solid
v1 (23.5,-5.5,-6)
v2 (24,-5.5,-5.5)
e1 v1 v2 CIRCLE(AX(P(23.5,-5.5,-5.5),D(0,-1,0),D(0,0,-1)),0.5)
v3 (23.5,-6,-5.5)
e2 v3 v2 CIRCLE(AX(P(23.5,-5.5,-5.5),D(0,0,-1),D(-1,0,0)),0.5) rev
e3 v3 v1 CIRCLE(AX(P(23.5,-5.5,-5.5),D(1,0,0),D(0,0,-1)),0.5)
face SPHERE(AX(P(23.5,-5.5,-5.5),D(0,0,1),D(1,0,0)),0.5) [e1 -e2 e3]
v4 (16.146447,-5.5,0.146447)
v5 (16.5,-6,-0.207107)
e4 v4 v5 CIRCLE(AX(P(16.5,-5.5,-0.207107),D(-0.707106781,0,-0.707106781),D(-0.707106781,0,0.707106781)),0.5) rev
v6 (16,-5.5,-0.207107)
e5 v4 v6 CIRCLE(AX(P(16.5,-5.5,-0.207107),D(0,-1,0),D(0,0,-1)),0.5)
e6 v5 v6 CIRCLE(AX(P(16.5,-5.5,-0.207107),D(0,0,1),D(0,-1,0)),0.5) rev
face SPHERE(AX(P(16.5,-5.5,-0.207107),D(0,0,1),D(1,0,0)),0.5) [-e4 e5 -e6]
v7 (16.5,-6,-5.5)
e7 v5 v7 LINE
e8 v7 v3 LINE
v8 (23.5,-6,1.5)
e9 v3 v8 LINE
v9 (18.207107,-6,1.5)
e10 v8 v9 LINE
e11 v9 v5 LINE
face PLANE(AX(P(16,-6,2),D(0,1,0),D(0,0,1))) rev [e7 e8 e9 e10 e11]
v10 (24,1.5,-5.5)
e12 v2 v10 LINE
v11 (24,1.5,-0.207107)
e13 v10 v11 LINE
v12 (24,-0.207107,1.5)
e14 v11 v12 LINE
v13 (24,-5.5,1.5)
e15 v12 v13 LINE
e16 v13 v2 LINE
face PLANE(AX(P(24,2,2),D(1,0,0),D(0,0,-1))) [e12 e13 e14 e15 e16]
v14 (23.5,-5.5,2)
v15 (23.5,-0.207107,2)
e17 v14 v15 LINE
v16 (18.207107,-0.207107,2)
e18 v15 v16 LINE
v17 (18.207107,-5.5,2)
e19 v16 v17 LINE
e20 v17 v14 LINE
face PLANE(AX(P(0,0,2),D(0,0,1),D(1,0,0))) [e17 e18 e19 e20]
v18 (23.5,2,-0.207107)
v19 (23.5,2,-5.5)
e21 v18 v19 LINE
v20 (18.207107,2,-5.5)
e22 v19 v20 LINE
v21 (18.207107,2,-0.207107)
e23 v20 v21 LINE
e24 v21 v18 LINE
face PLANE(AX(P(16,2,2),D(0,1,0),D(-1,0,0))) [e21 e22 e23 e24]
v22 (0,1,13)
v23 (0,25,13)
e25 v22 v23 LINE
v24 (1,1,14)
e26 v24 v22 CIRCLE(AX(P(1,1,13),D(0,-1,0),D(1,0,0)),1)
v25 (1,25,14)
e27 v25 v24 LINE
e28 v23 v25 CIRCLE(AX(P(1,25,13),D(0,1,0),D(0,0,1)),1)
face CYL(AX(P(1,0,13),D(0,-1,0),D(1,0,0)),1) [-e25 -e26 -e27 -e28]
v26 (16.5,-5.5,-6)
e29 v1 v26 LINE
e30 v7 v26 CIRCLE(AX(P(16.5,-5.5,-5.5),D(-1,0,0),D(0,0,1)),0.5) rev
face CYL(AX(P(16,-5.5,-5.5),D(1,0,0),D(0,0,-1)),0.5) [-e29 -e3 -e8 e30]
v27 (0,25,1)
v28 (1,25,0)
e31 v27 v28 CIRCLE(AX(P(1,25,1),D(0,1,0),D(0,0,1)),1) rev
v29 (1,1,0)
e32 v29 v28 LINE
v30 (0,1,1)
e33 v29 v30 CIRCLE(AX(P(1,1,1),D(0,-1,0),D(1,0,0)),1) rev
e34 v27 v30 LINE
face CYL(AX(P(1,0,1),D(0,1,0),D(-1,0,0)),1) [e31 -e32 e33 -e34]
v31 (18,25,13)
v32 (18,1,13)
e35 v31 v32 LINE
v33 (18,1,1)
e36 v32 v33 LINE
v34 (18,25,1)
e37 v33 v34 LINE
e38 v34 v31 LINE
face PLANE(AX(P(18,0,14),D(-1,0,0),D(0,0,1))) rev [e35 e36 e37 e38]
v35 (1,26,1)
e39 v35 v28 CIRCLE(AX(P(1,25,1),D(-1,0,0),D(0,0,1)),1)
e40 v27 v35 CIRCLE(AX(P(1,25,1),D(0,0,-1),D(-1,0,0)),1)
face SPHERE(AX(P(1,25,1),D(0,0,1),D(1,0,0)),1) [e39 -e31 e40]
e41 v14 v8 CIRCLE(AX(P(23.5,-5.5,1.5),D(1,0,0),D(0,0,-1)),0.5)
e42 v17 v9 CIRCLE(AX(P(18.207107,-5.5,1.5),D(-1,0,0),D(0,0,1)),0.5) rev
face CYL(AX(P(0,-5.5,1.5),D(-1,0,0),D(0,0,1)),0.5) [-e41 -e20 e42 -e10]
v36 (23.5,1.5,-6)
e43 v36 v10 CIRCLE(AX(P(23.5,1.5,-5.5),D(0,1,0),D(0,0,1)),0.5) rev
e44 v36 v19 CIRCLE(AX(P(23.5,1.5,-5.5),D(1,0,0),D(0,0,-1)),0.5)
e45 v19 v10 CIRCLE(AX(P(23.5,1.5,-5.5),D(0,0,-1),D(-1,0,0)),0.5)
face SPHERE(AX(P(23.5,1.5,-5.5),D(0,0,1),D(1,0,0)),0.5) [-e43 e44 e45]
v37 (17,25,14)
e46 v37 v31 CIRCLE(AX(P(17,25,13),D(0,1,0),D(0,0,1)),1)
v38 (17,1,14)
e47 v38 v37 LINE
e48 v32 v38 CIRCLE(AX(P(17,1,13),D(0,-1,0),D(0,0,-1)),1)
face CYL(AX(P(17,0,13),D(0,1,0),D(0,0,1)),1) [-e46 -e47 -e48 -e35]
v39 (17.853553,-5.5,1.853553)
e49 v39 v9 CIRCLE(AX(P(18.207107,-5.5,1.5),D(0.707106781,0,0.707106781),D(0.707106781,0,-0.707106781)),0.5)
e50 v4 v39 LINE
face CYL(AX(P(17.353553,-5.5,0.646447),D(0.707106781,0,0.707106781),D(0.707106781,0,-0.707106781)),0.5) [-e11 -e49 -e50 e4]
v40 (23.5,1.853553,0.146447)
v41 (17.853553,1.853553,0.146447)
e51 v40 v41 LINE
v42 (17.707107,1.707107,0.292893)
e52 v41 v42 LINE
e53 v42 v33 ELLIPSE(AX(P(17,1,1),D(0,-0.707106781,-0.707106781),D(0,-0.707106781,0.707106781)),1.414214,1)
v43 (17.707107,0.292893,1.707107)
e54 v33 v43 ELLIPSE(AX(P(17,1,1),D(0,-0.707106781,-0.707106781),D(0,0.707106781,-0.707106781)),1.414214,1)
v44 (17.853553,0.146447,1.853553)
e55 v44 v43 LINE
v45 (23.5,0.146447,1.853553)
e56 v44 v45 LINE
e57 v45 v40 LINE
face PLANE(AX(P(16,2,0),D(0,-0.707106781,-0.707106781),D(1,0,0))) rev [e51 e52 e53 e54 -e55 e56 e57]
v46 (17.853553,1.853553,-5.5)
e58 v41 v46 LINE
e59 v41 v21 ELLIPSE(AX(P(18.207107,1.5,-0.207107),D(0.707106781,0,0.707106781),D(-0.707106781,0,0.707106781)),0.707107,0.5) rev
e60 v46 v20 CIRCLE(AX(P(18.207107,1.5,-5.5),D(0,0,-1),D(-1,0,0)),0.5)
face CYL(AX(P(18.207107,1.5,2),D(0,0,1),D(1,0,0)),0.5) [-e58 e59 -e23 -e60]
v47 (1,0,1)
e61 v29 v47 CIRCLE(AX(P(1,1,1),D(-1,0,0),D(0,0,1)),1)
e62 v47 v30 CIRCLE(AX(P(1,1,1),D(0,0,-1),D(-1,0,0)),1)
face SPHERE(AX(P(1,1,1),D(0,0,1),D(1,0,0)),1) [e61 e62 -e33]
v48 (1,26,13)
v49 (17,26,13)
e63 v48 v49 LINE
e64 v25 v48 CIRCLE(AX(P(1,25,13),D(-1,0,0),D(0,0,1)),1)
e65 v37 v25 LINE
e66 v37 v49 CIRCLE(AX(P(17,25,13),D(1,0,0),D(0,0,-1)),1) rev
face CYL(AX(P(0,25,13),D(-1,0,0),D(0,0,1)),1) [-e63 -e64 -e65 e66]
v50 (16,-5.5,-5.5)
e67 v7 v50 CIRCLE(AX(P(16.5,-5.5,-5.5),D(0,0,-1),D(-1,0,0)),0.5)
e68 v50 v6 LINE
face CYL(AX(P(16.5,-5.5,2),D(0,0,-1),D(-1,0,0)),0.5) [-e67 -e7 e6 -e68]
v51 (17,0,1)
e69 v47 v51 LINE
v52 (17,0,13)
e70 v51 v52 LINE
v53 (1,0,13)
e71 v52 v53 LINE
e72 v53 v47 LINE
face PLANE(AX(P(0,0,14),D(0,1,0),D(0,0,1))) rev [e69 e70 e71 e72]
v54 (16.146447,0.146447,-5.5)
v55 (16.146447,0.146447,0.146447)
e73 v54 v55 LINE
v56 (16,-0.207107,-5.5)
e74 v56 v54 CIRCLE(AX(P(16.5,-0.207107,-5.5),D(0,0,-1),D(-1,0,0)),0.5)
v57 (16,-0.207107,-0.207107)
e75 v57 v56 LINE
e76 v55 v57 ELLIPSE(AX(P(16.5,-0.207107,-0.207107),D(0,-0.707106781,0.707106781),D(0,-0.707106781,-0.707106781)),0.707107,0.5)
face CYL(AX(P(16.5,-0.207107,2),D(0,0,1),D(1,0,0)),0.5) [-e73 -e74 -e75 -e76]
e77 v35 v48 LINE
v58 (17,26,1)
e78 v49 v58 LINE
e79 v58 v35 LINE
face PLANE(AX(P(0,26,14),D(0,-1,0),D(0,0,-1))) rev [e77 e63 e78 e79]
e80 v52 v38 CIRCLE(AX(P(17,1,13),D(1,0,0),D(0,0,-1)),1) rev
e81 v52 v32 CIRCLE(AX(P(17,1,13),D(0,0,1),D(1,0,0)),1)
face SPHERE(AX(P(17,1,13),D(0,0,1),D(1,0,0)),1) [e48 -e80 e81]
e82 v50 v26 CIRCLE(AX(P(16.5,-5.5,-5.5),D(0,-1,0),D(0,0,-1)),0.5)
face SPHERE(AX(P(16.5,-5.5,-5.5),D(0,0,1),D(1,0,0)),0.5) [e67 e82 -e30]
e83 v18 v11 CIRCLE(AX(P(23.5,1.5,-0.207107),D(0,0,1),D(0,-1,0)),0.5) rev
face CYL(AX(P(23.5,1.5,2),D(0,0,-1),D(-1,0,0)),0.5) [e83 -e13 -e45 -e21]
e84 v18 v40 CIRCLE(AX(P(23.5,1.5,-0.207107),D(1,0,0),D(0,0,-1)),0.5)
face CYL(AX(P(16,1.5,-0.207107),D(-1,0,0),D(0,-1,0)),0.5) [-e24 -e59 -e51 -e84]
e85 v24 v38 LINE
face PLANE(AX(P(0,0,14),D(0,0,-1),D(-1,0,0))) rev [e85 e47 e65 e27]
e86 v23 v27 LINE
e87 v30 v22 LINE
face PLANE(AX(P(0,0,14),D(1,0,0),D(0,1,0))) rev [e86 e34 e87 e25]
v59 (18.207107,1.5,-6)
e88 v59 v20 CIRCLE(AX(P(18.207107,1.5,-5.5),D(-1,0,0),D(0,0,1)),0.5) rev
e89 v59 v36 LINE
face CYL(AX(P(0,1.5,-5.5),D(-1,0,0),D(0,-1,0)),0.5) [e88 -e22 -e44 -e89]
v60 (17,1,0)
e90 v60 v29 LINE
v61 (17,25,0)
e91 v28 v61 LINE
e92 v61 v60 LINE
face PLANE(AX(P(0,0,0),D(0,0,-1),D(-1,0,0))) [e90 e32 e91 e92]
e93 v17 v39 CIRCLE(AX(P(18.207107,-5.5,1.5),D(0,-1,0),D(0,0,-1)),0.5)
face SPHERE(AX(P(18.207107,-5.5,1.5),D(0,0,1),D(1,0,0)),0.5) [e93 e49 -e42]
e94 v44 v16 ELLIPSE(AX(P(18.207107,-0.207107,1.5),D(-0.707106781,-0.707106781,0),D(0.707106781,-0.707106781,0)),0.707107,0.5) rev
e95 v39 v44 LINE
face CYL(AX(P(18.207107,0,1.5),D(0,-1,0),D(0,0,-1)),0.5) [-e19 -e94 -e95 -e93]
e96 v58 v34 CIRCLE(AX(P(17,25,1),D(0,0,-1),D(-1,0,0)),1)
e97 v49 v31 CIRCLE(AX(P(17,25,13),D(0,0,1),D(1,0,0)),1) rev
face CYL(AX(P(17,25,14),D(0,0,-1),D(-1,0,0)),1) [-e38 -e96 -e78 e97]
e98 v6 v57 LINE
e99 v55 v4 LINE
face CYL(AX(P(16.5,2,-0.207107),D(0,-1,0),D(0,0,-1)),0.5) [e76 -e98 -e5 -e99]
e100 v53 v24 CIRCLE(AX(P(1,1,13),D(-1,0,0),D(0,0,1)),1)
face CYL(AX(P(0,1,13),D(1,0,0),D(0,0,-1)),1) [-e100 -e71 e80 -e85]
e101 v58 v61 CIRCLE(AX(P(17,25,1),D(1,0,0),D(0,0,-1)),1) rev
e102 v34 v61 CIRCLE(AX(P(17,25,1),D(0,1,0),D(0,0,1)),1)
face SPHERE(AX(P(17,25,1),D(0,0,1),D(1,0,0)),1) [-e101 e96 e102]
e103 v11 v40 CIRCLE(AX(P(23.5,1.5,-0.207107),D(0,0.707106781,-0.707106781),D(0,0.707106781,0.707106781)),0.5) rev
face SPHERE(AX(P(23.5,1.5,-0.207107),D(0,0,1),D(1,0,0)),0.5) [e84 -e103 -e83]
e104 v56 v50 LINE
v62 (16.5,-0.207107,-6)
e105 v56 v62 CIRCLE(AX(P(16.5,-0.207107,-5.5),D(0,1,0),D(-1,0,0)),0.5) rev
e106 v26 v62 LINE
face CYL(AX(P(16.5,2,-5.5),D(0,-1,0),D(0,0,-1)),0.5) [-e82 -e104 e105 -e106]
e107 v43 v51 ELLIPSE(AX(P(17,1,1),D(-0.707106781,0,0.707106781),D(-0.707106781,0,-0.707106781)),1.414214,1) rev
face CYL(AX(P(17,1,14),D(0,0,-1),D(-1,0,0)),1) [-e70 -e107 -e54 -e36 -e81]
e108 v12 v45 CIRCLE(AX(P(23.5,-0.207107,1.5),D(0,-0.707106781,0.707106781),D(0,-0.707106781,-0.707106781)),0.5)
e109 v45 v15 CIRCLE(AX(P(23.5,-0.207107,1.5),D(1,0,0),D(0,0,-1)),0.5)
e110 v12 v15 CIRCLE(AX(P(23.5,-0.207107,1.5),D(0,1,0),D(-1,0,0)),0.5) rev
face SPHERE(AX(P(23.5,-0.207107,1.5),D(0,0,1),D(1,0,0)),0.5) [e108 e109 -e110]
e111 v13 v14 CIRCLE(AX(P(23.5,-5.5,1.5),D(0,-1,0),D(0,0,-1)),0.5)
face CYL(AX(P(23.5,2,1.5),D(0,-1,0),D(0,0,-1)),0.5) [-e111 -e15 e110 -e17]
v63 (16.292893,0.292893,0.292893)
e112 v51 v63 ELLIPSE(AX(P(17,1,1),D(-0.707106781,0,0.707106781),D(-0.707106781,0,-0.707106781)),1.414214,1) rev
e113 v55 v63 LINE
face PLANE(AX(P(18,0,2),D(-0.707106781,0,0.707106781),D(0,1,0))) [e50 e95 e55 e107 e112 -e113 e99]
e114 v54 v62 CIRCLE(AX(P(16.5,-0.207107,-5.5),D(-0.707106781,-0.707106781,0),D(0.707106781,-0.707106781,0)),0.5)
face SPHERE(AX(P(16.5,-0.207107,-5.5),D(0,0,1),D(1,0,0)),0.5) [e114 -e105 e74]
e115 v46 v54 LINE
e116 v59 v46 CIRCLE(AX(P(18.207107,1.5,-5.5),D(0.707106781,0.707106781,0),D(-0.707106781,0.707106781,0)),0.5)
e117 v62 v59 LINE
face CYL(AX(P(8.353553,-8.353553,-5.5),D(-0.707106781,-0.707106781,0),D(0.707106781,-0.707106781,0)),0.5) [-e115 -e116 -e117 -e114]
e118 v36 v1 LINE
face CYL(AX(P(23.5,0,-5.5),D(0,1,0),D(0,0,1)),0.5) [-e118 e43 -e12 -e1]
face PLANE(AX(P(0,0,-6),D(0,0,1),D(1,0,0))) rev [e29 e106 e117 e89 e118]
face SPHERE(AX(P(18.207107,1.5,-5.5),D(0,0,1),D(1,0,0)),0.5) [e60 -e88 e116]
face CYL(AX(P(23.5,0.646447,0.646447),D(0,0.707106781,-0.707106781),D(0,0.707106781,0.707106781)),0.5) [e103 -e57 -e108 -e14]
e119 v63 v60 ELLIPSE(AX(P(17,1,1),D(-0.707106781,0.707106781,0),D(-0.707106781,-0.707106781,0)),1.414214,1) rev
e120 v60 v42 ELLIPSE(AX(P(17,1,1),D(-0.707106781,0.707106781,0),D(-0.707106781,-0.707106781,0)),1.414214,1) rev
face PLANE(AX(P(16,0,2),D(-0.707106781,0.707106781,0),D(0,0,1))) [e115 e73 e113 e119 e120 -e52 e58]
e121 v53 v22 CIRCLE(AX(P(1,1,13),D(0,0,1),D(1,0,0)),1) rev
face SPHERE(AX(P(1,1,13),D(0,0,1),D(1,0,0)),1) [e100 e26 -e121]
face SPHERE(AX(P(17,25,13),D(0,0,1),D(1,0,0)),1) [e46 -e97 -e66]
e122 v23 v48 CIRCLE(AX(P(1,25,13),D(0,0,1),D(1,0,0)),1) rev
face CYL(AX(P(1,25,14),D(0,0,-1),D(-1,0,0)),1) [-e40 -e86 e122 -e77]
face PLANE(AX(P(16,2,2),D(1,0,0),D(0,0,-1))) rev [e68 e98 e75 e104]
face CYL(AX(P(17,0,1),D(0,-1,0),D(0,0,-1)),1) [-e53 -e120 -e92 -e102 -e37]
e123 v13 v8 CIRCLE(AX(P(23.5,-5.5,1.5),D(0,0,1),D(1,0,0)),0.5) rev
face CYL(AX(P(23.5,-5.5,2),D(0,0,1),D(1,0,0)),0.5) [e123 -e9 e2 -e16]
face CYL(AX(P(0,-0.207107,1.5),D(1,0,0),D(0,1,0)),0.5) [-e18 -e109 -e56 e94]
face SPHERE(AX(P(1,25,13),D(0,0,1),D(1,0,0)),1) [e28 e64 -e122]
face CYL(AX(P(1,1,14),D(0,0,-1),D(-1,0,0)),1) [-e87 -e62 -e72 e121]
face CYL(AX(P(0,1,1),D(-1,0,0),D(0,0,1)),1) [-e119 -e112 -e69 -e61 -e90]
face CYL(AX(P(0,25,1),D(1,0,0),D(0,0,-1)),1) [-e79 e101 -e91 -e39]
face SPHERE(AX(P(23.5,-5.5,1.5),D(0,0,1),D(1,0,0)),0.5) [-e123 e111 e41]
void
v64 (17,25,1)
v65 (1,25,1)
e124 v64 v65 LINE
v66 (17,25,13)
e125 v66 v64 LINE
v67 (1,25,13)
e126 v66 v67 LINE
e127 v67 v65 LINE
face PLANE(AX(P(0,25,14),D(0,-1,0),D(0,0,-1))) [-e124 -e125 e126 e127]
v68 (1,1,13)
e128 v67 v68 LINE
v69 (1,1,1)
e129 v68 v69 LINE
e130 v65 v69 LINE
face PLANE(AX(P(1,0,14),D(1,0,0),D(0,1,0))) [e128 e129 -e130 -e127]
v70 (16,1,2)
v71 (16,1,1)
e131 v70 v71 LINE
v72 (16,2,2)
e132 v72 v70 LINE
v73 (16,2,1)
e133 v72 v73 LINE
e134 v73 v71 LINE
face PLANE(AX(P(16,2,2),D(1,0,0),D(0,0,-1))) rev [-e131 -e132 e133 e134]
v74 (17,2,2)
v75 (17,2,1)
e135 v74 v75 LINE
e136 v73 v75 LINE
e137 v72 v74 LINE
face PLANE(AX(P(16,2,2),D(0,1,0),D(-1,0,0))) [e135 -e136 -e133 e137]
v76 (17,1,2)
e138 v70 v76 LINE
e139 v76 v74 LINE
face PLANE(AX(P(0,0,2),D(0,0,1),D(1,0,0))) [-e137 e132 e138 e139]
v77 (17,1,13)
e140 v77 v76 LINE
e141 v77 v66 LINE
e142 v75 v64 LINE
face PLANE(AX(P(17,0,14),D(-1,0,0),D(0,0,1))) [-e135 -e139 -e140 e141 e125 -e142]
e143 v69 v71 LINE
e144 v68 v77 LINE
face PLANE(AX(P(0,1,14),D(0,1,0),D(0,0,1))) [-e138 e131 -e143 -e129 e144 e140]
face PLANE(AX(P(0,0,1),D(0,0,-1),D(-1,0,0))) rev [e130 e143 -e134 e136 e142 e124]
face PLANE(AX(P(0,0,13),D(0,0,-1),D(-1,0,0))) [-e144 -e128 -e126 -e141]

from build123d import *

# Parameters (mm, degrees)
SKETCH1_W                = 18
SKETCH1_H                = 26
BOSS_EXTRUDE1_DEPTH      = 14
SHELL1_T                 = 1
BOSS_EXTRUDE3_DEPTH      = 6
BOSS_EXTRUDE3_DEPTH_BACK = 2
SKETCH2_W                = 8
SKETCH2_H                = 8
CHAMFER2_SIZE            = 2
FILLET1_R                = 1
FILLET2_R                = 0.5


with BuildPart() as part:
    # Sketch1 → Boss-Extrude1 (new body)
    with BuildSketch(Plane.XY):
        with Locations((9, 13)):
            Rectangle(SKETCH1_W, SKETCH1_H)
    extrude(amount=BOSS_EXTRUDE1_DEPTH)

    # Shell1 (no face opened: a closed hollow body)
    add(offset(amount=-SHELL1_T, mode=Mode.PRIVATE), mode=Mode.SUBTRACT)

    # Sketch2 → Boss-Extrude3 (add, two sides: drawn at the far end of the back side and taken through both)
    with BuildSketch(Plane(origin=(0, 0, 0), x_dir=(-1, 0, 0), z_dir=(0, 0, -1)).offset(-BOSS_EXTRUDE3_DEPTH_BACK)):
        with Locations((-20, -2)):
            Rectangle(SKETCH2_W, SKETCH2_H)
    extrude(amount=BOSS_EXTRUDE3_DEPTH + BOSS_EXTRUDE3_DEPTH_BACK)

    # Chamfer2
    chamfer2_edges = [part.edges().sort_by_distance(p)[0] for p in [
        (16, -3, 2),
        (16, 2, -3),
        (21, 2, 2),
    ]]
    chamfer(chamfer2_edges, length=CHAMFER2_SIZE)

    # Fillet1
    # the kernel refuses this fillet: 1 mm, written as the material it takes off along each edge
    with BuildSketch(Plane(origin=(1, 25, 1), x_dir=(0, 1, 0), z_dir=(0, 0, -1))) as fillet1_piece_1_section:
        Polygon((0, 0), (FILLET1_R, 0), (FILLET1_R, -FILLET1_R), (0, -FILLET1_R), align=None)
    fillet1_piece_1 = extrude(amount=FILLET1_R, mode=Mode.PRIVATE)
    fillet1_piece_1 = fillet1_piece_1 - Plane(origin=(1, 25, 1), x_dir=(0.7071067811865475, -0.7071067811865477, 0), z_dir=(0, 0, -1)) * Sphere(FILLET1_R, mode=Mode.PRIVATE)
    add(fillet1_piece_1, mode=Mode.SUBTRACT)
    with BuildSketch(Plane(origin=(1, 1, 1), x_dir=(0, 0, -1), z_dir=(0, -1, 0))) as fillet1_piece_2_section:
        Polygon((0, 0), (FILLET1_R, 0), (FILLET1_R, -FILLET1_R), (0, -FILLET1_R), align=None)
    fillet1_piece_2 = extrude(amount=FILLET1_R, mode=Mode.PRIVATE)
    fillet1_piece_2 = fillet1_piece_2 - Plane(origin=(1, 1, 1), x_dir=(0.7071067811865475, 0, 0.7071067811865475), z_dir=(0, -1, 0)) * Sphere(FILLET1_R, mode=Mode.PRIVATE)
    add(fillet1_piece_2, mode=Mode.SUBTRACT)
    with BuildSketch(Plane(origin=(17, 25, 1), x_dir=(0, 0, -1), z_dir=(0, 1, 0))) as fillet1_piece_3_section:
        Polygon((0, 0), (FILLET1_R, 0), (FILLET1_R, -FILLET1_R), (0, -FILLET1_R), align=None)
    fillet1_piece_3 = extrude(amount=FILLET1_R, mode=Mode.PRIVATE)
    fillet1_piece_3 = fillet1_piece_3 - Plane(origin=(17, 25, 1), x_dir=(-0.7071067811865475, 0, 0.7071067811865475), z_dir=(0, 1, 0)) * Sphere(FILLET1_R, mode=Mode.PRIVATE)
    add(fillet1_piece_3, mode=Mode.SUBTRACT)
    with BuildSketch(Plane(origin=(1, 1, 13), x_dir=(-1, 0, 0), z_dir=(0, -1, 0))) as fillet1_piece_4_section:
        Polygon((0, 0), (FILLET1_R, 0), (FILLET1_R, -FILLET1_R), (0, -FILLET1_R), align=None)
    fillet1_piece_4 = extrude(amount=FILLET1_R, mode=Mode.PRIVATE)
    fillet1_piece_4 = fillet1_piece_4 - Plane(origin=(1, 1, 13), x_dir=(0.7071067811865475, 0, -0.7071067811865475), z_dir=(0, -1, 0)) * Sphere(FILLET1_R, mode=Mode.PRIVATE)
    add(fillet1_piece_4, mode=Mode.SUBTRACT)
    with BuildSketch(Plane(origin=(17, 1, 13), x_dir=(1, 0, 0), z_dir=(0, -1, 0))) as fillet1_piece_5_section:
        Polygon((0, 0), (FILLET1_R, 0), (FILLET1_R, FILLET1_R), (0, FILLET1_R), align=None)
    fillet1_piece_5 = extrude(amount=FILLET1_R, mode=Mode.PRIVATE)
    fillet1_piece_5 = fillet1_piece_5 - Plane(origin=(17, 1, 13), x_dir=(-0.7071067811865475, 0, -0.7071067811865475), z_dir=(0, -1, 0)) * Sphere(FILLET1_R, mode=Mode.PRIVATE)
    add(fillet1_piece_5, mode=Mode.SUBTRACT)
    with BuildSketch(Plane(origin=(17, 25, 13), x_dir=(1, 0, 0), z_dir=(0, 1, 0))) as fillet1_piece_6_section:
        Polygon((0, 0), (FILLET1_R, 0), (FILLET1_R, -FILLET1_R), (0, -FILLET1_R), align=None)
    fillet1_piece_6 = extrude(amount=FILLET1_R, mode=Mode.PRIVATE)
    fillet1_piece_6 = fillet1_piece_6 - Plane(origin=(17, 25, 13), x_dir=(-0.7071067811865475, 0, -0.7071067811865475), z_dir=(0, 1, 0)) * Sphere(FILLET1_R, mode=Mode.PRIVATE)
    add(fillet1_piece_6, mode=Mode.SUBTRACT)
    with BuildSketch(Plane(origin=(1, 25, 13), x_dir=(-1, 0, 0), z_dir=(0, 1, 0))) as fillet1_piece_7_section:
        Polygon((0, 0), (FILLET1_R, 0), (FILLET1_R, FILLET1_R), (0, FILLET1_R), align=None)
    fillet1_piece_7 = extrude(amount=FILLET1_R, mode=Mode.PRIVATE)
    fillet1_piece_7 = fillet1_piece_7 - Plane(origin=(1, 25, 13), x_dir=(0.7071067811865475, 0, -0.7071067811865475), z_dir=(0, 1, 0)) * Sphere(FILLET1_R, mode=Mode.PRIVATE)
    add(fillet1_piece_7, mode=Mode.SUBTRACT)
    with BuildSketch(Plane(origin=(0, 25, 0), x_dir=(1, 0, 0), z_dir=(0, -1, 0)), Plane(origin=(18, 1, 14), x_dir=(0, 0, -1), z_dir=(0, 1, 0)), Plane(origin=(0, 25, 14), x_dir=(0, 0, -1), z_dir=(0, -1, 0))) as fillet1_piece_8:
        with BuildLine():
            CenterArc((FILLET1_R, FILLET1_R), FILLET1_R, 180, 90)
            Line((0, FILLET1_R), (0, 0))
            Line((0, 0), (FILLET1_R, 0))
        make_face()
    extrude(amount=24, mode=Mode.SUBTRACT)
    with BuildSketch(Plane(origin=(1, 0, 0), x_dir=(0, 0, 1), z_dir=(1, 0, 0))) as fillet1_piece_9_section:
        with BuildLine():
            CenterArc((FILLET1_R, -FILLET1_R), FILLET1_R, 90, 90)
            Line((0, -FILLET1_R), (0, 0))
            Line((0, 0), (FILLET1_R, 0))
        make_face()
    fillet1_piece_9 = extrude(amount=17.5, mode=Mode.PRIVATE)
    fillet1_piece_9 = split(fillet1_piece_9, bisect_by=Plane(origin=(12.381861728, 0.226424858, -3.618138272), z_dir=(-0.7071067811865476, 0, 0.7071067811865476)), keep=Keep.TOP, mode=Mode.PRIVATE)
    fillet1_piece_9 = split(fillet1_piece_9, bisect_by=Plane(origin=(12.381861728, -3.618138272, 0.226424858), z_dir=(-0.7071067811865476, 0.7071067811865476, 0)), keep=Keep.TOP, mode=Mode.PRIVATE)
    add(fillet1_piece_9, mode=Mode.SUBTRACT)
    with BuildSketch(Plane(origin=(1, 0, 0), x_dir=(0, 0, 1), z_dir=(1, 0, 0))) as fillet1_piece_10_section:
        with BuildLine():
            CenterArc((FILLET1_R, -FILLET1_R), FILLET1_R, 90, 90)
            Line((0, -FILLET1_R), (0, 0))
            Line((0, 0), (FILLET1_R, 0))
        make_face()
    fillet1_piece_10 = extrude(amount=17.5, mode=Mode.PRIVATE)
    fillet1_piece_10 = split(fillet1_piece_10, bisect_by=Plane(origin=(16.16446835, 0.528927527, 0.16446835), z_dir=(0.7071067811865476, 0, -0.7071067811865476)), keep=Keep.TOP, mode=Mode.PRIVATE)
    fillet1_piece_10 = split(fillet1_piece_10, bisect_by=Plane(origin=(16.407441135, 0.407441135, 0.042981958), z_dir=(-0.7071067811865476, 0.7071067811865476, 0)), keep=Keep.TOP, mode=Mode.PRIVATE)
    add(fillet1_piece_10, mode=Mode.SUBTRACT)
    with BuildSketch(Plane(origin=(1, 0, 0), x_dir=(0, 0, 1), z_dir=(1, 0, 0))) as fillet1_piece_11_section:
        with BuildLine():
            CenterArc((FILLET1_R, -FILLET1_R), FILLET1_R, 90, 90)
            Line((0, -FILLET1_R), (0, 0))
            Line((0, 0), (FILLET1_R, 0))
        make_face()
    fillet1_piece_11 = extrude(amount=17.5, mode=Mode.PRIVATE)
    fillet1_piece_11 = split(fillet1_piece_11, bisect_by=Plane(origin=(16.407441135, 0.042981958, 0.407441135), z_dir=(-0.7071067811865476, 0, 0.7071067811865476)), keep=Keep.TOP, mode=Mode.PRIVATE)
    fillet1_piece_11 = split(fillet1_piece_11, bisect_by=Plane(origin=(16.16446835, 0.16446835, 0.528927527), z_dir=(0.7071067811865476, -0.7071067811865476, 0)), keep=Keep.TOP, mode=Mode.PRIVATE)
    add(fillet1_piece_11, mode=Mode.SUBTRACT)
    with BuildSketch(Plane(origin=(18, -0.5, 0), x_dir=(-1, 0, 0), z_dir=(0, 1, 0))) as fillet1_piece_12_section:
        with BuildLine():
            CenterArc((FILLET1_R, FILLET1_R), FILLET1_R, 180, 90)
            Line((0, FILLET1_R), (0, 0))
            Line((0, 0), (FILLET1_R, 0))
        make_face()
    fillet1_piece_12 = extrude(amount=25.5, mode=Mode.PRIVATE)
    fillet1_piece_12 = split(fillet1_piece_12, bisect_by=Plane(origin=(17.83553165, 1.83553165, 0.528927527), z_dir=(0.7071067811865476, -0.7071067811865476, 0)), keep=Keep.TOP, mode=Mode.PRIVATE)
    fillet1_piece_12 = split(fillet1_piece_12, bisect_by=Plane(origin=(17.957018042, 1.592558865, 0.407441135), z_dir=(0, 0.7071067811865476, 0.7071067811865476)), keep=Keep.TOP, mode=Mode.PRIVATE)
    add(fillet1_piece_12, mode=Mode.SUBTRACT)
    with BuildSketch(Plane(origin=(18, -0.5, 0), x_dir=(-1, 0, 0), z_dir=(0, 1, 0))) as fillet1_piece_13_section:
        with BuildLine():
            CenterArc((FILLET1_R, FILLET1_R), FILLET1_R, 180, 90)
            Line((0, FILLET1_R), (0, 0))
            Line((0, 0), (FILLET1_R, 0))
        make_face()
    fillet1_piece_13 = extrude(amount=25.5, mode=Mode.PRIVATE)
    fillet1_piece_13 = split(fillet1_piece_13, bisect_by=Plane(origin=(17.592558865, 1.592558865, 0.042981958), z_dir=(-0.7071067811865476, 0.7071067811865476, 0)), keep=Keep.TOP, mode=Mode.PRIVATE)
    fillet1_piece_13 = split(fillet1_piece_13, bisect_by=Plane(origin=(17.471072473, 1.83553165, 0.16446835), z_dir=(0, -0.7071067811865476, -0.7071067811865476)), keep=Keep.TOP, mode=Mode.PRIVATE)
    add(fillet1_piece_13, mode=Mode.SUBTRACT)
    with BuildSketch(Plane(origin=(18, -0.5, 0), x_dir=(-1, 0, 0), z_dir=(0, 1, 0))) as fillet1_piece_14_section:
        with BuildLine():
            CenterArc((FILLET1_R, FILLET1_R), FILLET1_R, 180, 90)
            Line((0, FILLET1_R), (0, 0))
            Line((0, 0), (FILLET1_R, 0))
        make_face()
    fillet1_piece_14 = extrude(amount=25.5, mode=Mode.PRIVATE)
    fillet1_piece_14 = split(fillet1_piece_14, bisect_by=Plane(origin=(23.618173362, 7.618173362, 0.226414546), z_dir=(-0.7071067811865476, 0.7071067811865476, 0)), keep=Keep.TOP, mode=Mode.PRIVATE)
    fillet1_piece_14 = split(fillet1_piece_14, bisect_by=Plane(origin=(17.773585454, 7.618173362, -5.618173362), z_dir=(0, 0.7071067811865476, 0.7071067811865476)), keep=Keep.TOP, mode=Mode.PRIVATE)
    add(fillet1_piece_14, mode=Mode.SUBTRACT)
    with BuildSketch(Plane(origin=(17, 26, 0), x_dir=(0, -1, 0), z_dir=(-1, 0, 0)), Plane(origin=(1, 0, 14), x_dir=(0, 0, -1), z_dir=(1, 0, 0))) as fillet1_piece_15:
        with BuildLine():
            CenterArc((FILLET1_R, FILLET1_R), FILLET1_R, 180, 90)
            Line((0, FILLET1_R), (0, 0))
            Line((0, 0), (FILLET1_R, 0))
        make_face()
    extrude(amount=16, mode=Mode.SUBTRACT)
    with BuildSketch(Plane(origin=(17, 26, 14), x_dir=(0, -1, 0), z_dir=(-1, 0, 0))) as fillet1_piece_16:
        with BuildLine():
            CenterArc((FILLET1_R, -FILLET1_R), FILLET1_R, 90, 90)
            Line((0, -FILLET1_R), (0, 0))
            Line((0, 0), (FILLET1_R, 0))
        make_face()
    extrude(amount=16, mode=Mode.SUBTRACT)
    with BuildSketch(Plane(origin=(0, 26, 1), x_dir=(0, -1, 0), z_dir=(0, 0, 1)), Plane(origin=(0, 0, 1), x_dir=(1, 0, 0), z_dir=(0, 0, 1))) as fillet1_piece_17:
        with BuildLine():
            CenterArc((FILLET1_R, FILLET1_R), FILLET1_R, 180, 90)
            Line((0, FILLET1_R), (0, 0))
            Line((0, 0), (FILLET1_R, 0))
        make_face()
    extrude(amount=12, mode=Mode.SUBTRACT)
    with BuildSketch(Plane(origin=(18, 26, 1), x_dir=(0, -1, 0), z_dir=(0, 0, 1))) as fillet1_piece_18:
        with BuildLine():
            CenterArc((FILLET1_R, -FILLET1_R), FILLET1_R, 90, 90)
            Line((0, -FILLET1_R), (0, 0))
            Line((0, 0), (FILLET1_R, 0))
        make_face()
    extrude(amount=12, mode=Mode.SUBTRACT)
    with BuildSketch(Plane(origin=(18, 0, -0.5), x_dir=(-1, 0, 0), z_dir=(0, 0, 1))) as fillet1_piece_19_section:
        with BuildLine():
            CenterArc((FILLET1_R, -FILLET1_R), FILLET1_R, 90, 90)
            Line((0, -FILLET1_R), (0, 0))
            Line((0, 0), (FILLET1_R, 0))
        make_face()
    fillet1_piece_19 = extrude(amount=13.5, mode=Mode.PRIVATE)
    fillet1_piece_19 = split(fillet1_piece_19, bisect_by=Plane(origin=(17.83553165, 0.528927527, 1.83553165), z_dir=(0.7071067811865476, 0, -0.7071067811865476)), keep=Keep.TOP, mode=Mode.PRIVATE)
    fillet1_piece_19 = split(fillet1_piece_19, bisect_by=Plane(origin=(17.957018042, 0.407441135, 1.592558865), z_dir=(0, 0.7071067811865476, 0.7071067811865476)), keep=Keep.TOP, mode=Mode.PRIVATE)
    add(fillet1_piece_19, mode=Mode.SUBTRACT)
    with BuildSketch(Plane(origin=(18, 0, -0.5), x_dir=(-1, 0, 0), z_dir=(0, 0, 1))) as fillet1_piece_20_section:
        with BuildLine():
            CenterArc((FILLET1_R, -FILLET1_R), FILLET1_R, 90, 90)
            Line((0, -FILLET1_R), (0, 0))
            Line((0, 0), (FILLET1_R, 0))
        make_face()
    fillet1_piece_20 = extrude(amount=13.5, mode=Mode.PRIVATE)
    fillet1_piece_20 = split(fillet1_piece_20, bisect_by=Plane(origin=(17.592558865, 0.042981958, 1.592558865), z_dir=(-0.7071067811865476, 0, 0.7071067811865476)), keep=Keep.TOP, mode=Mode.PRIVATE)
    fillet1_piece_20 = split(fillet1_piece_20, bisect_by=Plane(origin=(17.471072473, 0.16446835, 1.83553165), z_dir=(0, -0.7071067811865476, -0.7071067811865476)), keep=Keep.TOP, mode=Mode.PRIVATE)
    add(fillet1_piece_20, mode=Mode.SUBTRACT)
    with BuildSketch(Plane(origin=(18, 0, -0.5), x_dir=(-1, 0, 0), z_dir=(0, 0, 1))) as fillet1_piece_21_section:
        with BuildLine():
            CenterArc((FILLET1_R, -FILLET1_R), FILLET1_R, 90, 90)
            Line((0, -FILLET1_R), (0, 0))
            Line((0, 0), (FILLET1_R, 0))
        make_face()
    fillet1_piece_21 = extrude(amount=13.5, mode=Mode.PRIVATE)
    fillet1_piece_21 = split(fillet1_piece_21, bisect_by=Plane(origin=(20.618101716, 0.226435602, 4.618101716), z_dir=(-0.7071067811865476, 0, 0.7071067811865476)), keep=Keep.TOP, mode=Mode.PRIVATE)
    fillet1_piece_21 = split(fillet1_piece_21, bisect_by=Plane(origin=(17.773564398, -2.618101716, 4.618101716), z_dir=(0, 0.7071067811865476, 0.7071067811865476)), keep=Keep.TOP, mode=Mode.PRIVATE)
    add(fillet1_piece_21, mode=Mode.SUBTRACT)

    # Fillet2
    fillet2_edges = [part.edges().sort_by_distance(p)[0] for p in [
        (20, -6, -6),
        (24, -6, -2),
        (24, -2, -6),
        (24, 2, -3),
        (21, 2, -6),
        (18, 2, -3),
        (21, 2, 0),
        (24, -3, 2),
        (24, 1, 1),
        (21, -6, 2),
        (18, -3, 2),
        (21, 0, 2),
        (16, -3, -6),
        (16, -6, -3),
        (16, -3, 0),
        (16, 0, -3),
        (17, 1, -6),
        (17, -6, 1),
    ]]
    fillet(fillet2_edges, radius=FILLET2_R)


solid = part.part
